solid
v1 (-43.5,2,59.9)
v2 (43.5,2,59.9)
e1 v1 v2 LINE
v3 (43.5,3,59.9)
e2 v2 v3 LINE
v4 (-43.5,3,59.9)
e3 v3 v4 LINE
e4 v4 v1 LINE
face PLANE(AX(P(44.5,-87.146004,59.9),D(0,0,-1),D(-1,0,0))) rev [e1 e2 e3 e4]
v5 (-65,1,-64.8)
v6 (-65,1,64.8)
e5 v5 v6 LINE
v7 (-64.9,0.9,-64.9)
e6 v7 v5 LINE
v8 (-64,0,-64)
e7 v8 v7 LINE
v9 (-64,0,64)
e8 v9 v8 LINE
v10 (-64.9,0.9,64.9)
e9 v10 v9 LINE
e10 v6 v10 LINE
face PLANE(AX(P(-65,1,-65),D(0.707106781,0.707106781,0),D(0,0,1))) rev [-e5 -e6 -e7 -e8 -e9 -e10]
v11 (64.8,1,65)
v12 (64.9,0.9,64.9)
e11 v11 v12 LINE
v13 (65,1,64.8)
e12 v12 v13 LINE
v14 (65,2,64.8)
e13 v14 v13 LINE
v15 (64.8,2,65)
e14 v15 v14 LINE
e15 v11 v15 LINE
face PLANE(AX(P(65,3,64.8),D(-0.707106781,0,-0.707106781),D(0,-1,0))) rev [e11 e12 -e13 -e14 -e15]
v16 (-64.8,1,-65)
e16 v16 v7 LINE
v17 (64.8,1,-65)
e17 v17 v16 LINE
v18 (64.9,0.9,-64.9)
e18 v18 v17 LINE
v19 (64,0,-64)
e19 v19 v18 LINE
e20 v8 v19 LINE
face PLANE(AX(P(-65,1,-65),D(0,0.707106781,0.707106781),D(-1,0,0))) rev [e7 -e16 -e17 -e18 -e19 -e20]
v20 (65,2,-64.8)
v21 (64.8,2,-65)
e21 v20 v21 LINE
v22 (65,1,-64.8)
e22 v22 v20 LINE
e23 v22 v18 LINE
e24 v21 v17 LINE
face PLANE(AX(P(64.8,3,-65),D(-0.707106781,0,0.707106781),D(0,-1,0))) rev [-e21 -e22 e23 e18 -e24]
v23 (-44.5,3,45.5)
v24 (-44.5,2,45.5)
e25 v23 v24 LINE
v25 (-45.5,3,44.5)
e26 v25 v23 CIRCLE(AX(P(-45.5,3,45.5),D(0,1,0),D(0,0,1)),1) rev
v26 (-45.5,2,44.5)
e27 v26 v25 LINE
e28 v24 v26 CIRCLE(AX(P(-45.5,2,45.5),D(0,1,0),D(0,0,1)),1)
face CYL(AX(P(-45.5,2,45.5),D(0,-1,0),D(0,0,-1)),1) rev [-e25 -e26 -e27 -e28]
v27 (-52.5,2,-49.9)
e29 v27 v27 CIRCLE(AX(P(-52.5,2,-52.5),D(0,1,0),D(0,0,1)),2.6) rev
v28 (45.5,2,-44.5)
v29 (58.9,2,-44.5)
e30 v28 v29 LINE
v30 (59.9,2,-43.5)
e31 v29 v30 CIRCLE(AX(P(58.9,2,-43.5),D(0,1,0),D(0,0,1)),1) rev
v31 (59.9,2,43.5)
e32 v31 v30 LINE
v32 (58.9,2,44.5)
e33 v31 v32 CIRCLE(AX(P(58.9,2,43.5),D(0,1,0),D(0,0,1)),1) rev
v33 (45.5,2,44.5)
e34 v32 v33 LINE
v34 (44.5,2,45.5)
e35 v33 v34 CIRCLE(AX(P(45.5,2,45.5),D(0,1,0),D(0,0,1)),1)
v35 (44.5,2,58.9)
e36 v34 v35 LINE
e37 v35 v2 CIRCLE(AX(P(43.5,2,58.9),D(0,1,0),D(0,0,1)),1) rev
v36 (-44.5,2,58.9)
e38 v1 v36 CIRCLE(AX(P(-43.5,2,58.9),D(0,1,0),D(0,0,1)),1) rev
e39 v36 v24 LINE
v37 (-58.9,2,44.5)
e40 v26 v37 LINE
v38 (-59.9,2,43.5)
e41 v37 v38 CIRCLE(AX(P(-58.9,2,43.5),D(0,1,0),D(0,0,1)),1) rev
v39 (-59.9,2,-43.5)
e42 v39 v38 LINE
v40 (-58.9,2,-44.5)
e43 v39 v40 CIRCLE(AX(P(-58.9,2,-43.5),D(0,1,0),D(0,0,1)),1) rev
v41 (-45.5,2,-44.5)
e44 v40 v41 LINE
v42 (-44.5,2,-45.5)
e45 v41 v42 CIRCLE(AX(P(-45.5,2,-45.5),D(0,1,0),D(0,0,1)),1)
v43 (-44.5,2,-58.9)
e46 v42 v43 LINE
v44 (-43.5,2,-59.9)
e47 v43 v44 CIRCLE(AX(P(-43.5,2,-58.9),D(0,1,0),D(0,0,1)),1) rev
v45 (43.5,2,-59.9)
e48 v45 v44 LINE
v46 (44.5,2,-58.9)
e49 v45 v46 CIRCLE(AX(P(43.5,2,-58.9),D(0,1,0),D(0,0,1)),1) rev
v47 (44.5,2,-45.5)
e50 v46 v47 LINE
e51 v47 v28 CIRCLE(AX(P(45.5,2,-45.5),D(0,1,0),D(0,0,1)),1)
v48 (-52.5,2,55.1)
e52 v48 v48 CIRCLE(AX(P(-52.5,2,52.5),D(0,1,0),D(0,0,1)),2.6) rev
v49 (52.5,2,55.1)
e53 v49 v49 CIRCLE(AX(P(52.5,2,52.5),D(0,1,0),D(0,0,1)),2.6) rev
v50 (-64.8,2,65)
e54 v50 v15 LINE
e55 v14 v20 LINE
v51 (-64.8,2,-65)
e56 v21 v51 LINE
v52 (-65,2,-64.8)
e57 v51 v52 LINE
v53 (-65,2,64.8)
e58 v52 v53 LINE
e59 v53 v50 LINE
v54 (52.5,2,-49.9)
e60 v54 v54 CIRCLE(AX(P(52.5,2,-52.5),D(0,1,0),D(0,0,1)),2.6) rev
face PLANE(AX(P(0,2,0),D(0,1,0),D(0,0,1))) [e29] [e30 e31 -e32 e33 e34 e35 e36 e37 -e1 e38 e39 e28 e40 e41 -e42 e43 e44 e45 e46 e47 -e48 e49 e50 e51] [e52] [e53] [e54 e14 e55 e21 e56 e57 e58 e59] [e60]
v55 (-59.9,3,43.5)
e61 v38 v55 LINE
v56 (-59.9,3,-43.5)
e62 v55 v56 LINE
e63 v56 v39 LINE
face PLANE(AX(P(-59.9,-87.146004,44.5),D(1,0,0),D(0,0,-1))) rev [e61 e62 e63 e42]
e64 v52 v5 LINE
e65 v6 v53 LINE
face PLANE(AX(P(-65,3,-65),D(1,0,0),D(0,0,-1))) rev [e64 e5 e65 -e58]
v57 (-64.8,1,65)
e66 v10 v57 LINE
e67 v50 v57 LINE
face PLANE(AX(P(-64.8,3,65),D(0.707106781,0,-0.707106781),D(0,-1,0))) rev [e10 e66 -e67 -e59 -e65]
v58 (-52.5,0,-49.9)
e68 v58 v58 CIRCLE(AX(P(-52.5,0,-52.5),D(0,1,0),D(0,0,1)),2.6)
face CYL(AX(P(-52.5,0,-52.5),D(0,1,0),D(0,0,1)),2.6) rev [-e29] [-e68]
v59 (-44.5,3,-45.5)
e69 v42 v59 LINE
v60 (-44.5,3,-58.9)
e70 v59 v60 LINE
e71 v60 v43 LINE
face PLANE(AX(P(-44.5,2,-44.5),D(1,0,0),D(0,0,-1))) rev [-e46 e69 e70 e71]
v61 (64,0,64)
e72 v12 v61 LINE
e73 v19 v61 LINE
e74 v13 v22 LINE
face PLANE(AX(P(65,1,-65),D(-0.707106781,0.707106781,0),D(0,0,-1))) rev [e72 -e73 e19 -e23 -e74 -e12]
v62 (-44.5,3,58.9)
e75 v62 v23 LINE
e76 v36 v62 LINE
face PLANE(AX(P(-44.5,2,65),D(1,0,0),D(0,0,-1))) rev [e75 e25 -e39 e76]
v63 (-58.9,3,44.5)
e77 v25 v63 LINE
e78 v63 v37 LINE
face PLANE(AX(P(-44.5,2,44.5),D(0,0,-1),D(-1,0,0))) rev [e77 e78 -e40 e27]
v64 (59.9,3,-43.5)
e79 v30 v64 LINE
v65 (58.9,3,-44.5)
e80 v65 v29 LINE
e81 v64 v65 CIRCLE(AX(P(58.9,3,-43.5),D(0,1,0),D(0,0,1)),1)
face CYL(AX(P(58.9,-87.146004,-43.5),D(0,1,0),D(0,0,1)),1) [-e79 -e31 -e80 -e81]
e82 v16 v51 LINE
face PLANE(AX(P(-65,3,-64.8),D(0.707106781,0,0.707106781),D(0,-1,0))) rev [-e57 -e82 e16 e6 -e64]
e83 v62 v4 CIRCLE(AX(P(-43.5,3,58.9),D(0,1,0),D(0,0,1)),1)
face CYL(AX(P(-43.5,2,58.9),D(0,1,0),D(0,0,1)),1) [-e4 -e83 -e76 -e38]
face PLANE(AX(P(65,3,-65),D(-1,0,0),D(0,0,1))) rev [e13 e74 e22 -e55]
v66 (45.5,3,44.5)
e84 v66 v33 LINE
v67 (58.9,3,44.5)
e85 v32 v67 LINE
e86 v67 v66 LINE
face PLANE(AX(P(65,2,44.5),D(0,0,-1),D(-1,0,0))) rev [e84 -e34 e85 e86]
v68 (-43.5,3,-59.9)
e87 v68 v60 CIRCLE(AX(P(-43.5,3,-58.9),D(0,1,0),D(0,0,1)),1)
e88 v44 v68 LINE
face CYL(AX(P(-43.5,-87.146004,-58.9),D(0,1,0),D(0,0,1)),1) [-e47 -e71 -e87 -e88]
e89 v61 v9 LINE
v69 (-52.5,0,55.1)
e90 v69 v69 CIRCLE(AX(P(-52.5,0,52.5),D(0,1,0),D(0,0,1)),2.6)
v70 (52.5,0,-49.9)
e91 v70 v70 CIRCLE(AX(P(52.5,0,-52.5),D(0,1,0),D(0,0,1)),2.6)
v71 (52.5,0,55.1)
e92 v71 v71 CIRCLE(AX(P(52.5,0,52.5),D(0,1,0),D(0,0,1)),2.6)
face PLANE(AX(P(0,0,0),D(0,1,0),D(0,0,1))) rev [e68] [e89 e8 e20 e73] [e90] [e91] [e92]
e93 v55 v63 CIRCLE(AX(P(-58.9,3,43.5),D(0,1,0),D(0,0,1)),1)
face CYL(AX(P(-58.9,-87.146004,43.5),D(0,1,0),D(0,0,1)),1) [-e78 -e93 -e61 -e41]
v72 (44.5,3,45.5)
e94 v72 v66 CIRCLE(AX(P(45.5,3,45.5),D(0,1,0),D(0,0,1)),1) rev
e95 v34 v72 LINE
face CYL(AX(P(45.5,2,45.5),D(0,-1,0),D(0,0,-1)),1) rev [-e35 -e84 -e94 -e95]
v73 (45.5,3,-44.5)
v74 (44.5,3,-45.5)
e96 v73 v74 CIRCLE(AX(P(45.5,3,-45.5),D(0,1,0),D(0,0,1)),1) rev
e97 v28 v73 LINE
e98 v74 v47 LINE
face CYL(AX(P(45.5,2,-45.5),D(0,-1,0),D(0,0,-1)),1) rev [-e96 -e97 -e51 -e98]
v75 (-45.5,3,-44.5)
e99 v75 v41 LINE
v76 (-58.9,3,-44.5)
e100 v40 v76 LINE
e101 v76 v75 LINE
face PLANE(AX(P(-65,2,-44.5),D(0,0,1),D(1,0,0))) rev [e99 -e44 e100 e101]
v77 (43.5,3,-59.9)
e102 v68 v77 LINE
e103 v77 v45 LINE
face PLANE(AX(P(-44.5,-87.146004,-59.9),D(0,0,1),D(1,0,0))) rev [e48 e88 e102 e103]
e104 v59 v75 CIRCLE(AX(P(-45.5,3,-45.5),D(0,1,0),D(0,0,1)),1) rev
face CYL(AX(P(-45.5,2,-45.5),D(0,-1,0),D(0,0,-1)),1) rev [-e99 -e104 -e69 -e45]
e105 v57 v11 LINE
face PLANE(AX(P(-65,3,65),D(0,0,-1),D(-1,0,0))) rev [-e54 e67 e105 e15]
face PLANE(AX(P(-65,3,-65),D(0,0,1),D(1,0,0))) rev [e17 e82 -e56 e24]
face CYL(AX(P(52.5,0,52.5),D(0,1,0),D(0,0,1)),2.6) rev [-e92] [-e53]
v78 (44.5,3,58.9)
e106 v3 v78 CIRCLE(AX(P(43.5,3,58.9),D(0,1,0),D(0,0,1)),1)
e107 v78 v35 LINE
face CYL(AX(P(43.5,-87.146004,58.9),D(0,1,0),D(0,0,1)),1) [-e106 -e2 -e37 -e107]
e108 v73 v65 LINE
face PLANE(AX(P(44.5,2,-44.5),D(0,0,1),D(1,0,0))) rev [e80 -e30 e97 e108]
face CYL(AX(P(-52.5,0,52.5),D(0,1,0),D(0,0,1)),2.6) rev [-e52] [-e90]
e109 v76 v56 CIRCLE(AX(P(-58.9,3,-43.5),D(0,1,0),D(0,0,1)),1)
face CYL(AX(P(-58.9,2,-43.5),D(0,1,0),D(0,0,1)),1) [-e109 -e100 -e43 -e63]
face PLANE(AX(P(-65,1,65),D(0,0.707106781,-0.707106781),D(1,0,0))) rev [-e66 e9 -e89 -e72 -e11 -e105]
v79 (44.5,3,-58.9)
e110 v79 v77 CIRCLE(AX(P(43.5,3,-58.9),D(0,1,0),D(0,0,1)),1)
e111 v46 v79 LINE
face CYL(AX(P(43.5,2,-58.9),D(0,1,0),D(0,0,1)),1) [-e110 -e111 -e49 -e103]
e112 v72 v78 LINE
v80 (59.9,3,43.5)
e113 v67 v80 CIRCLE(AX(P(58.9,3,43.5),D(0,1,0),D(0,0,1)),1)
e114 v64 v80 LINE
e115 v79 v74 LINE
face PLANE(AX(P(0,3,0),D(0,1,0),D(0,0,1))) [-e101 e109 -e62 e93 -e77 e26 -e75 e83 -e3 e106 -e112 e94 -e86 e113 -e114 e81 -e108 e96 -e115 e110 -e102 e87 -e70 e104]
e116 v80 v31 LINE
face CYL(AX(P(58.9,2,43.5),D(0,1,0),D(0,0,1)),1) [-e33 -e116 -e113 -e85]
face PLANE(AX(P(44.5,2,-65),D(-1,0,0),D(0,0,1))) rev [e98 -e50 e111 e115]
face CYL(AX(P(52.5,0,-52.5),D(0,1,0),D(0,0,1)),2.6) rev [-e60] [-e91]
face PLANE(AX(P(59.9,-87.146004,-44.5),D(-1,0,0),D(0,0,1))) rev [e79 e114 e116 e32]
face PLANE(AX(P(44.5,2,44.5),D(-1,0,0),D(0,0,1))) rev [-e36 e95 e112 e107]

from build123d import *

# Parameters (mm, degrees)
SKETCH_1_W          = 130
SKETCH_1_H          = 130
EXTRUDE_1_DEPTH     = 3
SKETCH_2_R          = 2.6
CUT_EXTRUDE_1_DEPTH = 92.972822073
SKETCH_4_W          = 20.5
SKETCH_4_H          = 20.5
CUT_EXTRUDE_2_DEPTH = 1
SKETCH_5_W          = 89
SKETCH_5_H          = 5.1
SKETCH_5_W_2        = 5.1
SKETCH_5_H_2        = 89
CUT_EXTRUDE_3_DEPTH = 1
CHAMFER_1_SIZE      = 0.2
CHAMFER_2_SIZE      = 1
FILLET_2_R          = 1


with BuildPart() as part:
    # 草图1 → 凸台-拉伸1 (new body)
    with BuildSketch(Plane(origin=(0, 0, 0), x_dir=(1, 0, 0), z_dir=(0, 1, 0))):
        Rectangle(SKETCH_1_W, SKETCH_1_H)
    extrude(amount=EXTRUDE_1_DEPTH)

    # 草图2 → 切除-拉伸1 (cut, through all)
    with BuildSketch(Plane(origin=(0, 3, 0), x_dir=(1, 0, 0), z_dir=(0, 1, 0))):
        with Locations(Location((52.5, 52.5, 0), (0, 0, 270))):
            Circle(SKETCH_2_R)
        with Locations(Location((52.5, -52.5, 0), (0, 0, 270))):
            Circle(SKETCH_2_R)
        with Locations(Location((-52.5, -52.5, 0), (0, 0, 270))):
            Circle(SKETCH_2_R)
        with Locations(Location((-52.5, 52.5, 0), (0, 0, 270))):
            Circle(SKETCH_2_R)
    extrude(amount=-CUT_EXTRUDE_1_DEPTH, mode=Mode.SUBTRACT)

    # 草图4 → 切除-拉伸2 (cut)
    with BuildSketch(Plane(origin=(0, 3, 0), x_dir=(1, 0, 0), z_dir=(0, 1, 0))):
        with Locations((54.75, 54.75)):
            Rectangle(SKETCH_4_W, SKETCH_4_H)
        with Locations((54.75, -54.75)):
            Rectangle(SKETCH_4_W, SKETCH_4_H)
        with Locations((-54.75, -54.75)):
            Rectangle(SKETCH_4_W, SKETCH_4_H)
        with Locations((-54.75, 54.75)):
            Rectangle(SKETCH_4_W, SKETCH_4_H)
    extrude(amount=-CUT_EXTRUDE_2_DEPTH, mode=Mode.SUBTRACT)

    # 草图5 → 切除-拉伸3 (cut)
    with BuildSketch(Plane(origin=(0, 3, 0), x_dir=(1, 0, 0), z_dir=(0, 1, 0))):
        with Locations((0, 62.45)):
            Rectangle(SKETCH_5_W, SKETCH_5_H)
        with Locations((62.45, 0)):
            Rectangle(SKETCH_5_W_2, SKETCH_5_H_2)
        with Locations((0, -62.45)):
            Rectangle(SKETCH_5_W, SKETCH_5_H)
        with Locations((-62.45, 0)):
            Rectangle(SKETCH_5_W_2, SKETCH_5_H_2)
    extrude(amount=-CUT_EXTRUDE_3_DEPTH, mode=Mode.SUBTRACT)

    # 倒角1
    chamfer_1_edges = [part.edges().sort_by_distance(p)[0] for p in [
        (65, 1, 65),
        (-65, 1, 65),
        (-65, 1, -65),
        (65, 1, -65),
    ]]
    chamfer(chamfer_1_edges, length=CHAMFER_1_SIZE)

    # 倒角2
    # the kernel refuses this chamfer: 1 mm, written as the material it takes off along each edge
    with BuildSketch(Plane(origin=(67.371682988, 0, 65), x_dir=(0, -0.027495876610586292, -0.9996219169112968), z_dir=(-1, 0, 0)), Plane(origin=(65, 0, -67.371682988), x_dir=(-0.9996219169112968, -0.027495876610586292, 0), z_dir=(0, 0, 1)), Plane(origin=(-65, 0, 67.371682988), x_dir=(0.9996219169112968, -0.027495876610586292, 0), z_dir=(0, 0, -1))) as chamfer_2_piece_1:
        Polygon((CHAMFER_2_SIZE * 0.999621916911, -CHAMFER_2_SIZE * 0.0274958766106), (-CHAMFER_2_SIZE * 0.0274958766106, -CHAMFER_2_SIZE * 0.999621916911), (0, 0), align=None)
    extrude(amount=134.743365976, mode=Mode.SUBTRACT)
    with BuildSketch(Plane(origin=(-67.371682988, 0, -65), x_dir=(0, 0.999621916911297, -0.02749587661058218), z_dir=(1, 0, 0))) as chamfer_2_piece_2:
        Polygon((CHAMFER_2_SIZE * 0.999621916911, CHAMFER_2_SIZE * 0.0274958766106), (-CHAMFER_2_SIZE * 0.0274958766106, CHAMFER_2_SIZE * 0.999621916911), (0, 0), align=None)
    extrude(amount=134.743365976, mode=Mode.SUBTRACT)

    # 圆角2
    fillet_2_edges = [part.edges().sort_by_distance(p)[0] for p in [
        (-44.5, 2.5, -59.9),
        (44.5, 2.5, -59.9),
        (59.9, 2.5, -44.5),
        (59.9, 2.5, 44.5),
        (44.5, 2.5, 59.9),
        (-44.5, 2.5, 59.9),
        (-59.9, 2.5, 44.5),
        (-59.9, 2.5, -44.5),
        (-44.5, 2.5, -44.5),
        (-44.5, 2.5, 44.5),
        (44.5, 2.5, 44.5),
        (44.5, 2.5, -44.5),
    ]]
    fillet(fillet_2_edges, radius=FILLET_2_R)


solid = part.part
